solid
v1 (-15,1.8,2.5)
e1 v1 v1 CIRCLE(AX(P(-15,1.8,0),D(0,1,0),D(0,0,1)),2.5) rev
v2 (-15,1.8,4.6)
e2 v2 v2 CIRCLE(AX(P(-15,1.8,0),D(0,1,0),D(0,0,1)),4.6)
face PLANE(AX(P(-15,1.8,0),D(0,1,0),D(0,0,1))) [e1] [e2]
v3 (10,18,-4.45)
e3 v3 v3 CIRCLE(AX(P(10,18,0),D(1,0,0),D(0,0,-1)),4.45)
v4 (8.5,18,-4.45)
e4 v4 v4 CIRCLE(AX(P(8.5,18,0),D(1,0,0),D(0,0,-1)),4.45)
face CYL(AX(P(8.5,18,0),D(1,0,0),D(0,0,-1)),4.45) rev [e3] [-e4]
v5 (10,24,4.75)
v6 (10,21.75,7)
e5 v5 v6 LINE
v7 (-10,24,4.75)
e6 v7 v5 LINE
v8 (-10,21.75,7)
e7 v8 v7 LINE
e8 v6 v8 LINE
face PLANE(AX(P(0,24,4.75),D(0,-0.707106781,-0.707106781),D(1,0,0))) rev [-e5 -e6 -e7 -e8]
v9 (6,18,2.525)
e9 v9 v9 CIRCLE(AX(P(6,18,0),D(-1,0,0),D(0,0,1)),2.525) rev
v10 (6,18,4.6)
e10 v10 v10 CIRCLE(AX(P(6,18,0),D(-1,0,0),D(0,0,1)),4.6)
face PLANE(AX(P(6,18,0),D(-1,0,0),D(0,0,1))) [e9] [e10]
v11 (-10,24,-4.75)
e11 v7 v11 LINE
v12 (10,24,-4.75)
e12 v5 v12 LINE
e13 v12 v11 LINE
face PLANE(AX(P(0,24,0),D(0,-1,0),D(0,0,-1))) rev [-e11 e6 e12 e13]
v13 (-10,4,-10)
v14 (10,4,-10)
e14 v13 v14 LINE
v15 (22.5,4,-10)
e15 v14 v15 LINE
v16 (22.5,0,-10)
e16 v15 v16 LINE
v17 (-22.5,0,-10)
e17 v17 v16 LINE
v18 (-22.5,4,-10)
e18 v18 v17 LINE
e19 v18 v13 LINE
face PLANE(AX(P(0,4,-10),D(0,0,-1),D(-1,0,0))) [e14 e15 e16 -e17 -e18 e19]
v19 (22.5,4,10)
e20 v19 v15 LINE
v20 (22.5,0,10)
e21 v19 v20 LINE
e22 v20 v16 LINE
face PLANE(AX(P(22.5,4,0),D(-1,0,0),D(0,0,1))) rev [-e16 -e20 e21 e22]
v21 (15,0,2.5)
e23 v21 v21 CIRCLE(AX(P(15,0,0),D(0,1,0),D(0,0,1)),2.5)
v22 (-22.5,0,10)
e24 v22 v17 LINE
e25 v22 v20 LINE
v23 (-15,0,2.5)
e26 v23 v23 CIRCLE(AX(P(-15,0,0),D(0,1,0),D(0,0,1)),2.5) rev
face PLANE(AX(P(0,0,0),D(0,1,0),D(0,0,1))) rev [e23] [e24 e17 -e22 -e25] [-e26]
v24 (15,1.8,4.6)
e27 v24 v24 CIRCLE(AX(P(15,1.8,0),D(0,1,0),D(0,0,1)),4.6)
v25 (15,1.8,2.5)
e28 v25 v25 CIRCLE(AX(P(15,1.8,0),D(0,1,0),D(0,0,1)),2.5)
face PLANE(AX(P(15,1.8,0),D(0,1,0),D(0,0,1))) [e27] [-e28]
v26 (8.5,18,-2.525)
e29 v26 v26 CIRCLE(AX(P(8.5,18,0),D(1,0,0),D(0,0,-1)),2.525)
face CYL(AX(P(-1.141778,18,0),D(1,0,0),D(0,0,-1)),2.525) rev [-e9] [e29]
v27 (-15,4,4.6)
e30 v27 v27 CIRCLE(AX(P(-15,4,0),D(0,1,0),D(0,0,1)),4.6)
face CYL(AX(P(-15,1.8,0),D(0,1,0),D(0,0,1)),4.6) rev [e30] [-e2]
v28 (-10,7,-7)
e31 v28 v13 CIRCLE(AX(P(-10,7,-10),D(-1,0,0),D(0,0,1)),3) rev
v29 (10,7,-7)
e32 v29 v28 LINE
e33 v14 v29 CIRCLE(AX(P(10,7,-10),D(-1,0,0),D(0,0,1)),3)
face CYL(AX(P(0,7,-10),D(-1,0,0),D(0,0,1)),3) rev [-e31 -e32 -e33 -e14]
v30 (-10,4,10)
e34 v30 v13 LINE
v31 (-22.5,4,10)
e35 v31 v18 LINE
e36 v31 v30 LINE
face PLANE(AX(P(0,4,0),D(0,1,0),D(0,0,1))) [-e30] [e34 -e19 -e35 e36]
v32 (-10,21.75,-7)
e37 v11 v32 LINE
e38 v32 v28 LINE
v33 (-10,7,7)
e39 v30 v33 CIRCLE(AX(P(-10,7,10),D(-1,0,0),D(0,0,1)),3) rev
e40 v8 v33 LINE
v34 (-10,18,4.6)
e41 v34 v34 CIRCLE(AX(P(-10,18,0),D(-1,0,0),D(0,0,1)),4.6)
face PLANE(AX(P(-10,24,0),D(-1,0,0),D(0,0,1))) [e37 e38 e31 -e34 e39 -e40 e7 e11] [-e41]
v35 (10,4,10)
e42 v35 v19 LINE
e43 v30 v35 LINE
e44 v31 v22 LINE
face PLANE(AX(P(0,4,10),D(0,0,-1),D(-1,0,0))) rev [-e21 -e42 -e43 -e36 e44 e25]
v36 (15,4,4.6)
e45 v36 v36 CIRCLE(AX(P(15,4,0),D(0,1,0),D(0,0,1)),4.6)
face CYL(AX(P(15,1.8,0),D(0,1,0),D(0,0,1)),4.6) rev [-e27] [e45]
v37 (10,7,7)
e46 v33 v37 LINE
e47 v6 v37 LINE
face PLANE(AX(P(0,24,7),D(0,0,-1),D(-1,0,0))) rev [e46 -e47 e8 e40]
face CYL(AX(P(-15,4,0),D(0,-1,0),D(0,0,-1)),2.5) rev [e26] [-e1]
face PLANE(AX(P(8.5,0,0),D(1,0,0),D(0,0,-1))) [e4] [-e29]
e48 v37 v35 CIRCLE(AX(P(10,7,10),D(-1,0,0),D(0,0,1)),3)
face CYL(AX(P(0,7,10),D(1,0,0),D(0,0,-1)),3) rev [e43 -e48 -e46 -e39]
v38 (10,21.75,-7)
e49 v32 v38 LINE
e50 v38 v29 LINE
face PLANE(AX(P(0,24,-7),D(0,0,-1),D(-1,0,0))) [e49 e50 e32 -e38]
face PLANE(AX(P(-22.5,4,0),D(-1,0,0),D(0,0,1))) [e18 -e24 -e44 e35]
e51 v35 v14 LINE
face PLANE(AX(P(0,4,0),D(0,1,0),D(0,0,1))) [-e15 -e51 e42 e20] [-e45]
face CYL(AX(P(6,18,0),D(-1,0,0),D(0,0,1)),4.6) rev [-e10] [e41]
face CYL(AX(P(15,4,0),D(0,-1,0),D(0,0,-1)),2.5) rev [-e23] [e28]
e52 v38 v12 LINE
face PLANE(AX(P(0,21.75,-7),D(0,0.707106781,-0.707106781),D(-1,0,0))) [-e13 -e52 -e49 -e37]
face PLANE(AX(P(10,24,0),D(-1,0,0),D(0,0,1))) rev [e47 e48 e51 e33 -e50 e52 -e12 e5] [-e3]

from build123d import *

# Parameters (mm, degrees)
SKETCH1_W           = 45
SKETCH1_H           = 20
SKETCH1_R           = 4.6
SKETCH1_W_2         = 20
SKETCH1_H_2         = 14
SKETCH1_R_2         = 2.5
BOSS_EXTRUDE1_DEPTH = 4
BOSS_EXTRUDE2_START = 4
SKETCH1_4_W         = 20
SKETCH1_4_H         = 14
BOSS_EXTRUDE2_DEPTH = 20
CUT_EXTRUDE1_START  = 4
SKETCH1_5_R         = 4.6
CUT_EXTRUDE1_DEPTH  = 2.2
CUT_EXTRUDE2_START  = -20
SKETCH2_R           = 4.6
CUT_EXTRUDE2_DEPTH  = 16
SKETCH2_6_R         = 2.525
CUT_EXTRUDE3_DEPTH  = 4
SKETCH2_7_R         = 4.45
SKETCH2_7_R_2       = 2.525
CUT_EXTRUDE4_DEPTH  = 1.5
FILLET1_R           = 3
CHAMFER1_SIZE       = 2.25


with BuildPart() as part:
    # Sketch1 → Boss-Extrude1 (new body)
    # profile 1 of 4: a face of its own
    with BuildSketch(Plane(origin=(0, 0, 0), x_dir=(1, 0, 0), z_dir=(0, 1, 0))):
        Rectangle(SKETCH1_W, SKETCH1_H)
        with Locations((15, 0)):
            Circle(SKETCH1_R, mode=Mode.SUBTRACT)
        with Locations((-15, 0)):
            Circle(SKETCH1_R, mode=Mode.SUBTRACT)
        Rectangle(SKETCH1_W_2, SKETCH1_H_2, mode=Mode.SUBTRACT)
    # profile 2 of 4: a face of its own
    with BuildSketch(Plane(origin=(0, 0, 0), x_dir=(1, 0, 0), z_dir=(0, 1, 0))):
        with Locations((-15, 0)):
            Circle(SKETCH1_R)
        with Locations(Location((-15, 0, 0), (0, 0, 270))):
            Circle(SKETCH1_R_2, mode=Mode.SUBTRACT)
    # profile 3 of 4: a face of its own
    with BuildSketch(Plane(origin=(0, 0, 0), x_dir=(1, 0, 0), z_dir=(0, 1, 0))):
        with Locations((15, 0)):
            Circle(SKETCH1_R)
        with Locations(Location((15, 0, 0), (0, 0, 270))):
            Circle(SKETCH1_R_2, mode=Mode.SUBTRACT)
    # profile 4 of 4: a face of its own
    with BuildSketch(Plane(origin=(0, 0, 0), x_dir=(1, 0, 0), z_dir=(0, 1, 0))):
        Rectangle(SKETCH1_W_2, SKETCH1_H_2)
    extrude(amount=BOSS_EXTRUDE1_DEPTH)

    # Sketch1<4> → Boss-Extrude2 (add)
    with BuildSketch(Plane(origin=(0, 0, 0), x_dir=(1, 0, 0), z_dir=(0, 1, 0)).offset(BOSS_EXTRUDE2_START)):
        Rectangle(SKETCH1_4_W, SKETCH1_4_H)
    extrude(amount=BOSS_EXTRUDE2_DEPTH)

    # Sketch1<5> → Cut-Extrude1 (cut)
    with BuildSketch(Plane(origin=(0, 0, 0), x_dir=(1, 0, 0), z_dir=(0, 1, 0)).offset(CUT_EXTRUDE1_START)):
        with Locations(Location((15, 0, 0), (0, 0, 270))):
            Circle(SKETCH1_5_R)
        with Locations(Location((-15, 0, 0), (0, 0, 270))):
            Circle(SKETCH1_5_R)
    extrude(amount=-CUT_EXTRUDE1_DEPTH, mode=Mode.SUBTRACT)

    # Sketch2 → Cut-Extrude2 (cut)
    with BuildSketch(Plane(origin=(10, 0, 0), x_dir=(0, 0, -1), z_dir=(1, 0, 0)).offset(CUT_EXTRUDE2_START)):
        with Locations(Location((0, 18, 0), (0, 0, 180))):
            Circle(SKETCH2_R)
    extrude(amount=CUT_EXTRUDE2_DEPTH, mode=Mode.SUBTRACT)

    # Sketch2<6> → Cut-Extrude3 (cut)
    with BuildSketch(Plane(origin=(10, 0, 0), x_dir=(0, 0, -1), z_dir=(1, 0, 0))):
        with Locations((0, 18)):
            Circle(SKETCH2_6_R)
    extrude(amount=-CUT_EXTRUDE3_DEPTH, mode=Mode.SUBTRACT)

    # Sketch2<7> → Cut-Extrude4 (cut)
    with BuildSketch(Plane(origin=(10, 0, 0), x_dir=(0, 0, -1), z_dir=(1, 0, 0))):
        with Locations((0, 18)):
            Circle(SKETCH2_7_R)
        with Locations((0, 18)):
            Circle(SKETCH2_7_R_2, mode=Mode.SUBTRACT)
    extrude(amount=-CUT_EXTRUDE4_DEPTH, mode=Mode.SUBTRACT)

    # Fillet1
    fillet1_edges = [part.edges().sort_by_distance(p)[0] for p in [
        (0, 4, 7),
        (0, 4, -7),
    ]]
    fillet(fillet1_edges, radius=FILLET1_R - 0.0001)  # a hair under: the kernel refuses the full size

    # Chamfer1
    chamfer1_edges = [part.edges().sort_by_distance(p)[0] for p in [
        (0, 24, -7),
        (0, 24, 7),
    ]]
    chamfer(chamfer1_edges, length=CHAMFER1_SIZE)


solid = part.part
